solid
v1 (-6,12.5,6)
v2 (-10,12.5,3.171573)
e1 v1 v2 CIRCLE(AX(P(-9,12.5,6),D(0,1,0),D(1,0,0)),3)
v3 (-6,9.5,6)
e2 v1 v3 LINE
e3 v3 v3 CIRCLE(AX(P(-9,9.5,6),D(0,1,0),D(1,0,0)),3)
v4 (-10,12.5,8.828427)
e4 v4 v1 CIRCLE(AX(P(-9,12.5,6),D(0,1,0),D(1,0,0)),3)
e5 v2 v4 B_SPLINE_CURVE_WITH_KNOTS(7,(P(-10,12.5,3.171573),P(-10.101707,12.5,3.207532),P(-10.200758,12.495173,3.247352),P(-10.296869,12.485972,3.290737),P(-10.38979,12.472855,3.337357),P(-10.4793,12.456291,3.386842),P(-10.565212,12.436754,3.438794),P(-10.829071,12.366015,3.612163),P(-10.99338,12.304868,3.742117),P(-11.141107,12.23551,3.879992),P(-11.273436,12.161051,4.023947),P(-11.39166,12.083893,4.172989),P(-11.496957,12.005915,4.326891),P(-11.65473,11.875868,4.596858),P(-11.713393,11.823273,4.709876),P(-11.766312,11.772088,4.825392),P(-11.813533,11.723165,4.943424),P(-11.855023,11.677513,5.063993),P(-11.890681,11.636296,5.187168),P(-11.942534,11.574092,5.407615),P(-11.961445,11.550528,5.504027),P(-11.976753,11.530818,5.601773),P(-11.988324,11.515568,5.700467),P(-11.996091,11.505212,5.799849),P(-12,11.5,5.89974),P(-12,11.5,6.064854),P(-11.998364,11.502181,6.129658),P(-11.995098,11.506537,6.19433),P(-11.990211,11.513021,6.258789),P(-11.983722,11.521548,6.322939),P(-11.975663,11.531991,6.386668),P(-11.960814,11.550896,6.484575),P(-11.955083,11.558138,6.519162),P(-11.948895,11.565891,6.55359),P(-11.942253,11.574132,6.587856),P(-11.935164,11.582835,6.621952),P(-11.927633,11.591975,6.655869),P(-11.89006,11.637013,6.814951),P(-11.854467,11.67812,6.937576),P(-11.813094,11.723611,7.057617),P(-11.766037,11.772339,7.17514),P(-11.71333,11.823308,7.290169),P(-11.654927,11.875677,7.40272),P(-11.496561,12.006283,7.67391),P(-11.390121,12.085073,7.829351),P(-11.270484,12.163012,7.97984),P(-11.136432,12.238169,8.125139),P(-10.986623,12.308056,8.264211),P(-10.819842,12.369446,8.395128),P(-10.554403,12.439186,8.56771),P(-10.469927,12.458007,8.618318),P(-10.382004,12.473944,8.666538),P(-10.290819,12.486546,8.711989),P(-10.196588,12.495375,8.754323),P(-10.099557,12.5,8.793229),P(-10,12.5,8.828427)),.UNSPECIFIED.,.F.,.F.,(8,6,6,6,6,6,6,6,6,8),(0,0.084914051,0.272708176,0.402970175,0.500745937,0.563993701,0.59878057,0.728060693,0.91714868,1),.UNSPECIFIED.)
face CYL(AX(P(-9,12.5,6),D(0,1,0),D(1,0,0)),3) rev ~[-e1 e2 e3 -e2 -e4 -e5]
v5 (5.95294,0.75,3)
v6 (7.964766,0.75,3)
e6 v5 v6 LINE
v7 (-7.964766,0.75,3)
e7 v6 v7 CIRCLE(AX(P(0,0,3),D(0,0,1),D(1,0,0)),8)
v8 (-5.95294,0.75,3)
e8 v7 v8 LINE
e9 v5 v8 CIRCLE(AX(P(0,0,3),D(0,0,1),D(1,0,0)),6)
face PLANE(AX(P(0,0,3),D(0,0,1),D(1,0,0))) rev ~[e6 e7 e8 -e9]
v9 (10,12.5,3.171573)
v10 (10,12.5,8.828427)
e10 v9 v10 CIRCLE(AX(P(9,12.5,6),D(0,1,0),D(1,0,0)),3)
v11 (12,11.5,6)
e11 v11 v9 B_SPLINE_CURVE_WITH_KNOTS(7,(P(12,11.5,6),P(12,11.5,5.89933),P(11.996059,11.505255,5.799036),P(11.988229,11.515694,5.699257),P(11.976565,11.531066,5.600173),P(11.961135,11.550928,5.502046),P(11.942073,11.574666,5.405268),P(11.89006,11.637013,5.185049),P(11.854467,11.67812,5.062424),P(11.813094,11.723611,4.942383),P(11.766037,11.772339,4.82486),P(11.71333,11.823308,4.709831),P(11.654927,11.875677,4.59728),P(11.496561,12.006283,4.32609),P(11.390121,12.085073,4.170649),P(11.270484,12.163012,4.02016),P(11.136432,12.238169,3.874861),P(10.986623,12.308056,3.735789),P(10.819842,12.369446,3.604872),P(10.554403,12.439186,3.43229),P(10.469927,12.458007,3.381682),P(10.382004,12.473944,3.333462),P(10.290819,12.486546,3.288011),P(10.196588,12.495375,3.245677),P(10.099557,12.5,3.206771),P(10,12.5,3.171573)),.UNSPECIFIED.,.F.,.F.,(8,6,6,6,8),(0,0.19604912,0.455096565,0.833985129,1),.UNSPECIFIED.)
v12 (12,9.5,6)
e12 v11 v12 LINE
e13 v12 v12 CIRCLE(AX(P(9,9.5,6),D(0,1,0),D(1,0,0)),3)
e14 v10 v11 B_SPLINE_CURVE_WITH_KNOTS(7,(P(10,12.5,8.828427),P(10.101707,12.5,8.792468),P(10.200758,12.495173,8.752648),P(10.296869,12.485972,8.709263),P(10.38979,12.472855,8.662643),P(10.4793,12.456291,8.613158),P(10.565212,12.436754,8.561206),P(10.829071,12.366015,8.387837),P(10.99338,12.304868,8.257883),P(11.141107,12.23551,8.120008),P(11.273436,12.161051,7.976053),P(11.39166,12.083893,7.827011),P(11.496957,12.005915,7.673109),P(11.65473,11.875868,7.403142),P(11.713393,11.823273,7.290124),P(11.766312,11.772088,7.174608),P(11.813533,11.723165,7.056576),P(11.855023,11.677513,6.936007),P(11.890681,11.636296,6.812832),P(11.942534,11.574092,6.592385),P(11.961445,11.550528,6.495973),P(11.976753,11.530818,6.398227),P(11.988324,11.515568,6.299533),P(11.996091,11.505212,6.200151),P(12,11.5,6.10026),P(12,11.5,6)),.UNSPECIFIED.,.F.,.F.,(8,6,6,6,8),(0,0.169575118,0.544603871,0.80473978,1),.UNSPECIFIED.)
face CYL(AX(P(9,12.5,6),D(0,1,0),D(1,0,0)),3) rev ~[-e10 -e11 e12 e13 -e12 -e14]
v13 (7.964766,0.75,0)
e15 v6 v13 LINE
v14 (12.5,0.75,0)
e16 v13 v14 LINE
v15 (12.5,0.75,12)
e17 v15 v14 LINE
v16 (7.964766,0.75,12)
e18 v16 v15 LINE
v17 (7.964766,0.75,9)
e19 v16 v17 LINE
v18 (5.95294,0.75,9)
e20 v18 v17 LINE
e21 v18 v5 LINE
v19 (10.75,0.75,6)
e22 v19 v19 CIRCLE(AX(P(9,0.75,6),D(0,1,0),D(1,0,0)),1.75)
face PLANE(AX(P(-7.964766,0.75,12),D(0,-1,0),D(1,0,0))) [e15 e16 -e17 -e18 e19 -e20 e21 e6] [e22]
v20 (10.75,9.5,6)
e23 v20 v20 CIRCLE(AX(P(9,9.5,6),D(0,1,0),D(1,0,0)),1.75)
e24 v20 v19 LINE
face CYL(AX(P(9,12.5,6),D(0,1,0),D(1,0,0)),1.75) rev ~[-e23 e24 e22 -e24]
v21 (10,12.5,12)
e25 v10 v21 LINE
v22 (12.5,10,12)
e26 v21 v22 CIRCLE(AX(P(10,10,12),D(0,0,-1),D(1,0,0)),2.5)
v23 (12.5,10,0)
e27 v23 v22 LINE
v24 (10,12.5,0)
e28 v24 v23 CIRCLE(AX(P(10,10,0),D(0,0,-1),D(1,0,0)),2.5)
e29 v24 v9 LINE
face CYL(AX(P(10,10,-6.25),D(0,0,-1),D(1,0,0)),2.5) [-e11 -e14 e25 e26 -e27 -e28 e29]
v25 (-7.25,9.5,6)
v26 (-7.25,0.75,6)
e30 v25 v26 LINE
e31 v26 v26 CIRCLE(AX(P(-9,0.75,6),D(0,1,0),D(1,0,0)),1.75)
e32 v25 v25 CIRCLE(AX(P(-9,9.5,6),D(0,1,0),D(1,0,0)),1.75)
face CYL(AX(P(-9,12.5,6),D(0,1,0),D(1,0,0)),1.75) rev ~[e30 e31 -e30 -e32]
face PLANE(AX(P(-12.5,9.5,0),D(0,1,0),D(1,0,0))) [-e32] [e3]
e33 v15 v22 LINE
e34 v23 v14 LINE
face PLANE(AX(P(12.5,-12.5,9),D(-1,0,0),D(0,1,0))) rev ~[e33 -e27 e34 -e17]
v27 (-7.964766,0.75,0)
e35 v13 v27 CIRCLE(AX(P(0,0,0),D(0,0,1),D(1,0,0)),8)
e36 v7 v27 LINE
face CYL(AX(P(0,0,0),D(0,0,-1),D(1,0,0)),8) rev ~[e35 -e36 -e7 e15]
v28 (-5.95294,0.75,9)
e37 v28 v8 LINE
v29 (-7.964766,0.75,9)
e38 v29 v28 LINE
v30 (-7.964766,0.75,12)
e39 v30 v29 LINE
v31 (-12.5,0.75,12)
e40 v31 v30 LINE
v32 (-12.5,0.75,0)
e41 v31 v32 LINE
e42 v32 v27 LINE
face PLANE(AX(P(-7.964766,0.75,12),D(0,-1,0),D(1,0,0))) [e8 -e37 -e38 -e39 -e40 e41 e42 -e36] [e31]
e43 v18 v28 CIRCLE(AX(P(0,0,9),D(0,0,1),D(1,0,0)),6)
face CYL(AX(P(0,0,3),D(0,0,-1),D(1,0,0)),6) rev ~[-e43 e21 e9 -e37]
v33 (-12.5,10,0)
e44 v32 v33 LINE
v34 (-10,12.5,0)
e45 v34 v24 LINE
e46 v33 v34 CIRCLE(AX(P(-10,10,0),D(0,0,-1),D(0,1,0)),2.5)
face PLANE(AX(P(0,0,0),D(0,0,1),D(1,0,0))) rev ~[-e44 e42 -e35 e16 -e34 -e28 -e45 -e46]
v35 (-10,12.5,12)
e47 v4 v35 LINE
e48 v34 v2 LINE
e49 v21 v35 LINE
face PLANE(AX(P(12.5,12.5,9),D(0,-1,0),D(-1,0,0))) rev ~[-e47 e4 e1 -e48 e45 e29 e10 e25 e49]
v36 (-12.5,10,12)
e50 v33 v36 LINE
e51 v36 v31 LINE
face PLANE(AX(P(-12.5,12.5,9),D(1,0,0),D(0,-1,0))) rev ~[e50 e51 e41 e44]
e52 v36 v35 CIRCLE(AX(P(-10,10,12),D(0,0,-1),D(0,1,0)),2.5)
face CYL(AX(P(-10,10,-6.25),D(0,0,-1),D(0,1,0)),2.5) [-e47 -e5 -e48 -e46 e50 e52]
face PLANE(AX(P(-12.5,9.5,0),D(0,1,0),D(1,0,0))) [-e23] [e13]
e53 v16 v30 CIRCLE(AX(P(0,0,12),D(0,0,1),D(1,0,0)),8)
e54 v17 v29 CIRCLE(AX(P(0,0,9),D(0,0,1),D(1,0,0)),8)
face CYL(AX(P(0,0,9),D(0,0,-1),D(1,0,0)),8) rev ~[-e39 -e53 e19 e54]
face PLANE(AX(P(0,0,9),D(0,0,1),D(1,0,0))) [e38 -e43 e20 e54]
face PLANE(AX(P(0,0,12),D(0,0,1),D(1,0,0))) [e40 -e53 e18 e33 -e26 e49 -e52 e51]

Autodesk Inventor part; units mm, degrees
ref_plane "YZ Plane" through (0, 0, 0) normal (1, 0, 0) x (0, 1, 0)
ref_plane "XZ Plane" through (0, 0, 0) normal (0, 1, 0) x (-1, 0, 0)
ref_plane "XY Plane" through (0, 0, 0) normal (0, 0, 1) x (1, 0, 0)
sketch "Sketch1" plane through (0, 0, 0) normal (0, 0, 1) x (1, 0, 0)
  line L0 (-12.5, 12.5) -> (12.5, 12.5)
  line L1 (12.5, 12.5) -> (12.5, -12.5)
  line L2 (12.5, -12.5) -> (-12.5, -12.5)
  line L3 (-12.5, -12.5) -> (-12.5, 12.5)
  circle A0 centre (0, 0) radius 8
  point P0 (0, 12.5)
  point P1 (-12.5, 0)
  dimension "d0" = 25
  dimension "d2" = 16
extrude "Extrusion1" add sketch "Sketch1" along normal blind 3
sketch "Sketch2" plane through (0, 0, 3) normal (0, 0, 1) x (1, 0, 0)
  circle A0 centre (0, 0) radius 8 projected
  line L0 (12.5, 12.5) -> (-12.5, 12.5) projected
  line L1 (-12.5, 12.5) -> (-12.5, -12.5) projected
  line L2 (-12.5, -12.5) -> (12.5, -12.5) projected
  line L3 (12.5, -12.5) -> (12.5, 12.5) projected
  circle A1 centre (0, 0) radius 6
  dimension "d5" = 12
extrude "Extrusion2" add sketch "Sketch2" along normal blind 6 contours A0 | L3 L2 L1 L0
sketch "Sketch3" plane through (0, 0, 9) normal (0, 0, 1) x (1, 0, 0)
  line L0 (12.5, 12.5) -> (-12.5, 12.5) projected
  line L1 (-12.5, 12.5) -> (-12.5, -12.5) projected
  line L2 (-12.5, -12.5) -> (12.5, -12.5) projected
  line L3 (12.5, -12.5) -> (12.5, 12.5) projected
  circle A0 centre (0, 0) radius 8 projected
extrude "Extrusion3" add sketch "Sketch3" along normal blind 3
sketch "Sketch4" plane through (0, 0, 12) normal (0, 0, 1) x (1, 0, 0)
  circle A0 centre (0, 0) radius 8 projected
  line L0 (-12.5, 12.5) -> (-12.5, -12.5) projected
  line L1 (-12.5, 0.75) -> (12.5, 0.75)
  line L2 (12.5, 0.75) -> (12.5, -12.5)
  line L3 (12.5, -12.5) -> (-12.5, -12.5)
  line L4 (-12.5, -12.5) -> (-12.5, 0.75)
  dimension "d11" = 0.75
extrude "Extrusion4" cut sketch "Sketch4" against normal through all contours A0 L1 | A0 L1 L2 L3 L0 picked at (-1.088, -1.9346)
sketch "Sketch5" plane through (-12.5, 12.5, 0) normal (0, 1, 0) x (1, 0, 0)
  line L0 (0, 0) -> (0, -12) projected
  line L1 (25, 0) -> (25, -12) projected
  circle A0 centre (3.5, -6) radius 1.75
  circle A1 centre (21.5, -6) radius 1.75
  point P0 (12.5, 0)
  point P1 (25, -6)
  point P2 (0, -6)
  dimension "d14" = 3.5
  dimension "d16" = 3.5
  dimension "d17" = 3.5
extrude "Extrusion5" cut sketch "Sketch5" against normal through all
sketch "Sketch6" plane through (-12.5, 12.5, 0) normal (0, 1, 0) x (1, 0, 0)
  circle A0 centre (3.5, -6) radius 1.75 projected
  circle A1 centre (21.5, -6) radius 1.75 projected
  circle A2 centre (3.5, -6) radius 3
  circle A3 centre (21.5, -6) radius 3
  point P0 (12.5, 0)
  dimension "d20" = 6
  dimension "d22" = 6
extrude "Extrusion6" cut sketch "Sketch6" against normal blind 3
fillet "Fillet1" radius 2.5 2 edges at (-12.5, 12.5, 6) (12.5, 12.5, 6)
properties part number "e3d mount"
